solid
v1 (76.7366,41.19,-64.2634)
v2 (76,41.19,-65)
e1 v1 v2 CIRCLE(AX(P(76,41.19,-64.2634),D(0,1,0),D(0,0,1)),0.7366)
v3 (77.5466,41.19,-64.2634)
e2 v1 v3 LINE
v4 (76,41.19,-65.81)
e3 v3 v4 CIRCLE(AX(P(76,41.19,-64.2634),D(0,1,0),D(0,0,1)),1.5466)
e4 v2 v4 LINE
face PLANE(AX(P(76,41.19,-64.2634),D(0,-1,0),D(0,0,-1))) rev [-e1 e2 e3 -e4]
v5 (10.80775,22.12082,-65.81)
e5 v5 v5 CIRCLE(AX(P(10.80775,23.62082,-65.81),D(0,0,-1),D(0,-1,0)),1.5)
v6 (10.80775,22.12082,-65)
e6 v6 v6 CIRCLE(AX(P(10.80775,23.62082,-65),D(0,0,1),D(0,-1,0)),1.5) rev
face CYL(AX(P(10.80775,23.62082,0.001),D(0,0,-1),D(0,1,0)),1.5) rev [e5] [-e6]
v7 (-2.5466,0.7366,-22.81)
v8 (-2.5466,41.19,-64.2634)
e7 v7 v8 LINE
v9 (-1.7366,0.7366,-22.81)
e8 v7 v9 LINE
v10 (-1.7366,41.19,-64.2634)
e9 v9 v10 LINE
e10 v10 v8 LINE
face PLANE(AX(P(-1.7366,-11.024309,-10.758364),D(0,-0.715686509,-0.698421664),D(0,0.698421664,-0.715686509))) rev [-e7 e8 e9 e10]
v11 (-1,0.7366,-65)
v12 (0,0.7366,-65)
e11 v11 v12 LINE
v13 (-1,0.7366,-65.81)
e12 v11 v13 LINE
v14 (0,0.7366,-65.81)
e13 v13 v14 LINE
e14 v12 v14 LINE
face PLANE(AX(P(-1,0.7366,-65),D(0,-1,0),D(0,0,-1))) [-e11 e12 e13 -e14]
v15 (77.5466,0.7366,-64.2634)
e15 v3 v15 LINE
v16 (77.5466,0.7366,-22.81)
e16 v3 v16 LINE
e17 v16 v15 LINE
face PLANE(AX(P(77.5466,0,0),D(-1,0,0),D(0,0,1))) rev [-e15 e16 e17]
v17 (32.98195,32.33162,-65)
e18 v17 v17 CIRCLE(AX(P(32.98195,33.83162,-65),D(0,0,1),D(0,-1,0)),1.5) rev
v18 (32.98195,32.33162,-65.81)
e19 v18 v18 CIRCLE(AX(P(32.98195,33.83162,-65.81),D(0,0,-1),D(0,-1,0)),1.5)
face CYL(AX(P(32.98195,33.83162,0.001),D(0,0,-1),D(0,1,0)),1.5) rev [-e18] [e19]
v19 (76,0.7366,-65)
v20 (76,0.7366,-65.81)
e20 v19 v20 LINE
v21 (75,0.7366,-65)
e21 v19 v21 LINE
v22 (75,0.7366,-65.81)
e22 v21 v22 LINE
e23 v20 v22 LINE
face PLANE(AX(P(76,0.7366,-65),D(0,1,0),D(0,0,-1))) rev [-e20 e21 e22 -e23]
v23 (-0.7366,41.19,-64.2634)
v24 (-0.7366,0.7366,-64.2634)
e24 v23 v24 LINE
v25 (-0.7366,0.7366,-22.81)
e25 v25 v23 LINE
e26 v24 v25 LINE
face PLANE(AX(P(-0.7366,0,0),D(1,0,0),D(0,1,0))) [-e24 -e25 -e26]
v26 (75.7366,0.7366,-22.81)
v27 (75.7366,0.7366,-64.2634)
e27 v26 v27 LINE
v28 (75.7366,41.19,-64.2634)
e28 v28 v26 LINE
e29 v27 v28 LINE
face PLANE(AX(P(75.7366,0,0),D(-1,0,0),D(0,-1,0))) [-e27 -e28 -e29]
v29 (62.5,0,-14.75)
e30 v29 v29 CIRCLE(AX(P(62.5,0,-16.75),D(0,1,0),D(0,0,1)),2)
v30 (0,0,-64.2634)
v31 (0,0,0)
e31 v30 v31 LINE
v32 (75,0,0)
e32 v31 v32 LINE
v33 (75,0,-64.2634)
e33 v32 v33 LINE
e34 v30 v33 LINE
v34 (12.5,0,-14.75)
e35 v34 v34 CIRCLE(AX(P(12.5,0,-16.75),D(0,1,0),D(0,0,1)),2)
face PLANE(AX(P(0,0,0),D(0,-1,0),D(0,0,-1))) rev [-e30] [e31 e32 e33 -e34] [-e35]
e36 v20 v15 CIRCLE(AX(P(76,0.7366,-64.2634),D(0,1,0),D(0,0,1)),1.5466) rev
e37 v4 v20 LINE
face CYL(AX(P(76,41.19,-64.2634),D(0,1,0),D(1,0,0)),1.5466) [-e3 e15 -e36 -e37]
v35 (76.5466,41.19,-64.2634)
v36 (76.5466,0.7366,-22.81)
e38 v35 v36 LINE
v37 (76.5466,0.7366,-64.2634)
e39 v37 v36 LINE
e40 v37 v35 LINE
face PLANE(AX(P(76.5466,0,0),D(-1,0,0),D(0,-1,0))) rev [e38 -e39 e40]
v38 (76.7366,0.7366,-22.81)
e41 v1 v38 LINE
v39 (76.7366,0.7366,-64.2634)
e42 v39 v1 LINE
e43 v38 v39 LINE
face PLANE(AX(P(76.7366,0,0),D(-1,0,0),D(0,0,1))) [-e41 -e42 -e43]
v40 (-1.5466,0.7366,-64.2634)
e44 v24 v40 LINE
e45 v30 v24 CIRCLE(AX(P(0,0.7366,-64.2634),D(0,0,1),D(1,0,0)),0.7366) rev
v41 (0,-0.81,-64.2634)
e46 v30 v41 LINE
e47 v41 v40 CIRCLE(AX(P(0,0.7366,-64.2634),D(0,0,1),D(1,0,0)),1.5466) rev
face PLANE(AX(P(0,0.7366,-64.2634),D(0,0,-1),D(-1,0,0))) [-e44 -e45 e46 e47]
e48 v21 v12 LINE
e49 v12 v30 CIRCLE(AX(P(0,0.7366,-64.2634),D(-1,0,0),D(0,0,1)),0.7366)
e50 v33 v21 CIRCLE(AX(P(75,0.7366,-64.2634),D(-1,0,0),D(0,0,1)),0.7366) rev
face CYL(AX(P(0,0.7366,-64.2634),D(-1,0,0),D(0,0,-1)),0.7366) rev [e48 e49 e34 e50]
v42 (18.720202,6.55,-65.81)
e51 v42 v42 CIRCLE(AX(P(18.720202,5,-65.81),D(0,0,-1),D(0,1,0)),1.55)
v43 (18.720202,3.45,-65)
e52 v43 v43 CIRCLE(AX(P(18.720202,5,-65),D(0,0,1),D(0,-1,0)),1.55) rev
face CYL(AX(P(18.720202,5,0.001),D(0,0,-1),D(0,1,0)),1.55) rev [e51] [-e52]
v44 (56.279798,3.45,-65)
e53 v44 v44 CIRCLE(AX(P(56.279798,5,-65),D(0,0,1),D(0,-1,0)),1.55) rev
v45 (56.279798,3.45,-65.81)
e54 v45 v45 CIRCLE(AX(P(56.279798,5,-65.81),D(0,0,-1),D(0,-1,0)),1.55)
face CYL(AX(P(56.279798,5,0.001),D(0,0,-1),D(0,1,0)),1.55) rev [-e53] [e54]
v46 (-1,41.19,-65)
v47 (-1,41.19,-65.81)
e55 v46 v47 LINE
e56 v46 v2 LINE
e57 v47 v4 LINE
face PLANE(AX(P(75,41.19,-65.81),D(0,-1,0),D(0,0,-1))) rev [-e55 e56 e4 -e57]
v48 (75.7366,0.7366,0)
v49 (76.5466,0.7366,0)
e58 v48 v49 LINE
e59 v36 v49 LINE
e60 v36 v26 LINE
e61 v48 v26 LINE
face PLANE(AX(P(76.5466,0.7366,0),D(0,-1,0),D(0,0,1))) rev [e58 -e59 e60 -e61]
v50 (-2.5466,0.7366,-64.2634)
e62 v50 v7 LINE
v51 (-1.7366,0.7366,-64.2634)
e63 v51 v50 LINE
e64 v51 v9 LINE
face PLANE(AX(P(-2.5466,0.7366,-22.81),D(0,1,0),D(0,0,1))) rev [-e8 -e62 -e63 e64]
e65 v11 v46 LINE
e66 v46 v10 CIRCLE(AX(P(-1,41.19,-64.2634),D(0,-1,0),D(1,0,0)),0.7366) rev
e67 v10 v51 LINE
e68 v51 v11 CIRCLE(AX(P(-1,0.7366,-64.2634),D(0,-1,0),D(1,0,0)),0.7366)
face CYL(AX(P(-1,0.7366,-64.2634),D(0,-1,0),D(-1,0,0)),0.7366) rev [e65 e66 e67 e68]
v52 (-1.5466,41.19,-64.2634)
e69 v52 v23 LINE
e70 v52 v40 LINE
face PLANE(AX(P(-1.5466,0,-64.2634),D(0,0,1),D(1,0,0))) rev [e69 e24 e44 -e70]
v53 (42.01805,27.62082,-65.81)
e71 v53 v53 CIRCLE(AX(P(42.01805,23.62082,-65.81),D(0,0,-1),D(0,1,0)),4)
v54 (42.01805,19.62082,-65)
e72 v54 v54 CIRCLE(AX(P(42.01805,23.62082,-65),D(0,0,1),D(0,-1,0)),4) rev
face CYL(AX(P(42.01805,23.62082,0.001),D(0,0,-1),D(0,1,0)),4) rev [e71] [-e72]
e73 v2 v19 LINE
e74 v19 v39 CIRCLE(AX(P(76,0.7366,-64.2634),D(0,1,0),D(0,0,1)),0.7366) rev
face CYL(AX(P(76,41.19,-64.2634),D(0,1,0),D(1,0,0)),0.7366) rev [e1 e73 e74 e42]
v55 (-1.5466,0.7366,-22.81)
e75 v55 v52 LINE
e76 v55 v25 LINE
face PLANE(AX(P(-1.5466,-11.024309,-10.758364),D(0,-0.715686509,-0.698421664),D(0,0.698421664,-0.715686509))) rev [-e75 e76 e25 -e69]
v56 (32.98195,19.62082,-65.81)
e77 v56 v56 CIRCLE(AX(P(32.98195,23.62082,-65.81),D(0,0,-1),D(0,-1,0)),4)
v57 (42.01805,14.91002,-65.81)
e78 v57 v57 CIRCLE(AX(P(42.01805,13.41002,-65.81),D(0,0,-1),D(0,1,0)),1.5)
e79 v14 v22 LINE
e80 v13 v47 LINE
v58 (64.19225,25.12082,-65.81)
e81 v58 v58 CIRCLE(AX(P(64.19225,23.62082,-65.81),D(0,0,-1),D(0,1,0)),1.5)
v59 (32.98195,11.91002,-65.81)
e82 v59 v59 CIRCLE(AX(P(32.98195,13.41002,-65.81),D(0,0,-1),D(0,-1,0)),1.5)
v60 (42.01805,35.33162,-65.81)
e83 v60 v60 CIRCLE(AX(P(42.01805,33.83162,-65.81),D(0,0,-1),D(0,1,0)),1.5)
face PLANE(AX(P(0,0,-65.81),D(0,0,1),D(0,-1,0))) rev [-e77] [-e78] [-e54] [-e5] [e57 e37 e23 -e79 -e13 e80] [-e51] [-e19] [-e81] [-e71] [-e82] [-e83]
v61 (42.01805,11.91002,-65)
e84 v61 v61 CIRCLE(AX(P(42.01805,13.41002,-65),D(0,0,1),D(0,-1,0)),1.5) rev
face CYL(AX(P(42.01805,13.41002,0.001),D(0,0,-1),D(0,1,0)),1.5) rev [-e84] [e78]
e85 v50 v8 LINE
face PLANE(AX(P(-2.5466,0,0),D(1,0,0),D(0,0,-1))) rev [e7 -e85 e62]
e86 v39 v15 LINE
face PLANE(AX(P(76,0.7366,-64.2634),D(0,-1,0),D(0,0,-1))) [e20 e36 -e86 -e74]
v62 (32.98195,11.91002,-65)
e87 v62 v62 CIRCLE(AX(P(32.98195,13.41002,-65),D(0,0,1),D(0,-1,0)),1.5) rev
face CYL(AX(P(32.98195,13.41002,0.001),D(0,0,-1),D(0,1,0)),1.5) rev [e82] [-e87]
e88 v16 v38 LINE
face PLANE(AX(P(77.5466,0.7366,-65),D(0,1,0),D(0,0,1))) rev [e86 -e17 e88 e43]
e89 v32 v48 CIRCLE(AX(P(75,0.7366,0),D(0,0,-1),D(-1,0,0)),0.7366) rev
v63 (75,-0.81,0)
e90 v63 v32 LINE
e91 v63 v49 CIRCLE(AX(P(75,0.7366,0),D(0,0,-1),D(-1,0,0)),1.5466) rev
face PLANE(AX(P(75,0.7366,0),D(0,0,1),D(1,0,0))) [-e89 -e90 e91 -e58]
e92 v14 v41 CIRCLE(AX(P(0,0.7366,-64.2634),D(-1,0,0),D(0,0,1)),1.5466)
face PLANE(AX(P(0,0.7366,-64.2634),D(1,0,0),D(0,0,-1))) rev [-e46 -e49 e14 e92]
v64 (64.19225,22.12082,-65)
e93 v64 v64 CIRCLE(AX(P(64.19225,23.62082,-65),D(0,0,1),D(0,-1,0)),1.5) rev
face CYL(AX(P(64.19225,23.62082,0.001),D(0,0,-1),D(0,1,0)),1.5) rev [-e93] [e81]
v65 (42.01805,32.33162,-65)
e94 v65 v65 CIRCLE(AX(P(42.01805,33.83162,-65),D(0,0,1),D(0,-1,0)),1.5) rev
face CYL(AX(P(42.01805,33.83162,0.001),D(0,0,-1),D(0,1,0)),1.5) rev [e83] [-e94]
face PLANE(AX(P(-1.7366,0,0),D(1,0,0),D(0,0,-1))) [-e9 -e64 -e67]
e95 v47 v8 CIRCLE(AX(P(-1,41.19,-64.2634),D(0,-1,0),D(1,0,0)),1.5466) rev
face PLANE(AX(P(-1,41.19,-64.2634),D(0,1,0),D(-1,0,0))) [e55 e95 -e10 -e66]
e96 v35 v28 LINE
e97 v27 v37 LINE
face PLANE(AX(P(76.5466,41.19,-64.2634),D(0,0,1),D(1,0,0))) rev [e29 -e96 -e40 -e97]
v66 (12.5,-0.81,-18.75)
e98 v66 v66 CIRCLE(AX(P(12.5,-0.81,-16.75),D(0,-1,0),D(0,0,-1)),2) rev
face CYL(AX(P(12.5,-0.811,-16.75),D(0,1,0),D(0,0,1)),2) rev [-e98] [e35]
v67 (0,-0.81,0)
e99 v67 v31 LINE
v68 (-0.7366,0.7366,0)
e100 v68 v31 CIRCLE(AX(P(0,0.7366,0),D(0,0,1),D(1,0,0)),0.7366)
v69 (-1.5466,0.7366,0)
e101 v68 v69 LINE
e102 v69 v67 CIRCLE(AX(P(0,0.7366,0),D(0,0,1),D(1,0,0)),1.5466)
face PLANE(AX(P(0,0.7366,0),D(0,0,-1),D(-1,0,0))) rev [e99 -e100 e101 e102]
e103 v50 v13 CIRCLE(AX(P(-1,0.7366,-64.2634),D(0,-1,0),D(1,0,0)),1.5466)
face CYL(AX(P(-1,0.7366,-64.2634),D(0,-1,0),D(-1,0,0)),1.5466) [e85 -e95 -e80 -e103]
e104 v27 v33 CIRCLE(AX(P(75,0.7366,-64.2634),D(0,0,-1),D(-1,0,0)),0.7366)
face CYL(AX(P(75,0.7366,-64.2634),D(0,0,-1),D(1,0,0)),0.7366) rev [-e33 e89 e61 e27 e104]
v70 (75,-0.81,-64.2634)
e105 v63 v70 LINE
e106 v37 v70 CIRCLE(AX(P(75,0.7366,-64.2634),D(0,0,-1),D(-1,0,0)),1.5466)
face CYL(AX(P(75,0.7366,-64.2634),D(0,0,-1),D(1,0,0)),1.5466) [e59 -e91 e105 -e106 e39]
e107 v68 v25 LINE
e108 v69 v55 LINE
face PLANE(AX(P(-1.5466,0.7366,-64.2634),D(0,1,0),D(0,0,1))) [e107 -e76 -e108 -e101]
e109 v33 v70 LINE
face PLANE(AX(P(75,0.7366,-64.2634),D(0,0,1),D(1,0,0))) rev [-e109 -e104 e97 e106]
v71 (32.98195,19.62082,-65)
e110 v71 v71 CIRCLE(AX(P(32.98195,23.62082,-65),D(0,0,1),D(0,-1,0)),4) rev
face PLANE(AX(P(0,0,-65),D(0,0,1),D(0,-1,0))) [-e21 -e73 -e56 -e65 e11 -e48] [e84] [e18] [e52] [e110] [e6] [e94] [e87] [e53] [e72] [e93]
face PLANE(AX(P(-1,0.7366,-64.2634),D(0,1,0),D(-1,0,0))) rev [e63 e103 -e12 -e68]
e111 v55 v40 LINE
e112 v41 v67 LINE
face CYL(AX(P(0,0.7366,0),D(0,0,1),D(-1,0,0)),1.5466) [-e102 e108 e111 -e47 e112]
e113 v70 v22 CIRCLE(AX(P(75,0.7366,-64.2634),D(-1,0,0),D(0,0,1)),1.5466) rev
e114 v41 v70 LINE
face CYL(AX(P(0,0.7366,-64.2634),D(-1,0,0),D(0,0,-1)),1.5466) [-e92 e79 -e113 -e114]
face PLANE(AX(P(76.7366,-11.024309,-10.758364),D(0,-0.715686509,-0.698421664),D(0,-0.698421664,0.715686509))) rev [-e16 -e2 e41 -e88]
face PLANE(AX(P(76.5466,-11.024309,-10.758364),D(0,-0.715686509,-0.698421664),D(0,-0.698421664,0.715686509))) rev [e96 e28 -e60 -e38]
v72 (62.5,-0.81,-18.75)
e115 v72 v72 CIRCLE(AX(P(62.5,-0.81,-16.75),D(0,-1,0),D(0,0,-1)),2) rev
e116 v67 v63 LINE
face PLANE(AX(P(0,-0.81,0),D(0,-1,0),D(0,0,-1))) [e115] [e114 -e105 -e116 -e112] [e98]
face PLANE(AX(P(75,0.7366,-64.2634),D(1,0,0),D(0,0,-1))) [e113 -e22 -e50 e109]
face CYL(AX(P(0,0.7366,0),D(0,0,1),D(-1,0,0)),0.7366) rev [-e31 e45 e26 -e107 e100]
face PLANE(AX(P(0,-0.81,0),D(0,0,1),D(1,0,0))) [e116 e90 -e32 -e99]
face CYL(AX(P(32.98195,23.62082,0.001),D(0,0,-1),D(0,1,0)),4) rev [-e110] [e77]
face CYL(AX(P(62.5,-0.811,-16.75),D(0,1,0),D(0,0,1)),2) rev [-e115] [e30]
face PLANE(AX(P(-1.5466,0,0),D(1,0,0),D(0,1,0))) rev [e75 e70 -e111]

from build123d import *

# Parameters (mm, degrees)
SKETCH1_W                    = 75
SKETCH1_H                    = 65
BASE_FLANGE1_DEPTH           = 0.81
EDGE_FLANGE1_STRIP_W         = 4.7132
EDGE_FLANGE1_STRIP_H         = 0.81
EDGE_FLANGE1_STRIP_CUT_DEPTH = 75
EDGE_FLANGE1_DEPTH           = 75
EDGE_FLANGE2_DEPTH           = 40.4534
EDGE_FLANGE2_BEND_DEPTH      = 40.4534
EDGE_FLANGE3_DEPTH           = 64.2634
EDGE_FLANGE3_BEND_DEPTH      = 64.2634
CUT_EXTRUDE1_REACH           = 113.546
CUT_EXTRUDE2_REACH           = 111.732
SKETCH24_R                   = 4
SKETCH24_R_2                 = 1.5
SKETCH24_R_3                 = 1.55
CUT_EXTRUDE3_REACH           = 111.732
SKETCH25_R                   = 2


# Sheet-metal steps are written as plain solids
with BuildPart() as part:
    # Sketch1 → Base-Flange1 (new body)
    with BuildSketch(Plane(origin=(0, 0, 0), x_dir=(1, 0, 0), z_dir=(0, 1, 0))):
        with Locations((37.5, 32.5)):
            Rectangle(SKETCH1_W, SKETCH1_H)
    extrude(amount=-BASE_FLANGE1_DEPTH)

    # Edge-Flange1 strip (across the edge) → Edge-Flange1 strip cut (cut)
    with BuildSketch(Plane(origin=(75, 0, -65), x_dir=(0, 0, 1), z_dir=(-1, 0, 0))):
        with Locations((-1.62, -0.405)):
            Rectangle(EDGE_FLANGE1_STRIP_W, EDGE_FLANGE1_STRIP_H)
    extrude(amount=EDGE_FLANGE1_STRIP_CUT_DEPTH, mode=Mode.SUBTRACT)

    # Edge-Flange1 section (across the edge) → Edge-Flange1 (add)
    with BuildSketch(Plane(origin=(75, 0, -65), x_dir=(0, 0, 1), z_dir=(-1, 0, 0))):
        with BuildLine():
            Line((-0.81, 0.7366), (-0.81, 41.19))
            Line((-0.81, 41.19), (0, 41.19))
            Line((0, 41.19), (0, 0.7366))
            ThreePointArc((0, 0.7366), (0.215745145, 0.215745145), (0.7366, 0))
            Line((0.7366, 0), (0.7366, -0.81))
            ThreePointArc((0.7366, -0.81), (-0.357011348, -0.357011348), (-0.81, 0.7366))
        make_face()
    extrude(amount=EDGE_FLANGE1_DEPTH)

    # Edge-Flange2 section (across the edge) → Edge-Flange2 (add)
    with BuildSketch(Plane(origin=(-1.7366, 41.19, -65), x_dir=(1, 0, 0), z_dir=(0, -1, 0))):
        with BuildLine():
            Line((-0.81, 0.7366), (-0.81, 42.19))
            Line((-0.81, 42.19), (0, 42.19))
            Line((0, 42.19), (0, 0.7366))
            ThreePointArc((0, 0.7366), (0.215745145, 0.215745145), (0.7366, 0))
            Line((0.7366, 0), (1.7366, 0))
            Line((1.7366, 0), (1.7366, -0.81))
            Line((1.7366, -0.81), (0.7366, -0.81))
            ThreePointArc((0.7366, -0.81), (-0.357011348, -0.357011348), (-0.81, 0.7366))
        make_face()
    extrude(amount=EDGE_FLANGE2_DEPTH)

    # Edge-Flange2 section 2 (across the edge) → Edge-Flange2 bend (add)
    with BuildSketch(Plane(origin=(76.7366, 0.7366, -65), x_dir=(-1, 0, 0), z_dir=(0, 1, 0))):
        with BuildLine():
            Line((-0.81, 0.7366), (-0.81, 42.19))
            Line((-0.81, 42.19), (0, 42.19))
            Line((0, 42.19), (0, 0.7366))
            ThreePointArc((0, 0.7366), (0.215745145, 0.215745145), (0.7366, 0))
            Line((0.7366, 0), (1.7366, 0))
            Line((1.7366, 0), (1.7366, -0.81))
            Line((1.7366, -0.81), (0.7366, -0.81))
            ThreePointArc((0.7366, -0.81), (-0.357011348, -0.357011348), (-0.81, 0.7366))
        make_face()
    extrude(amount=EDGE_FLANGE2_BEND_DEPTH)

    # Edge-Flange3 section (across the edge) → Edge-Flange3 (add)
    with BuildSketch(Plane(origin=(-0.7366, 0, -64.2634), x_dir=(1, 0, 0), z_dir=(0, 0, 1))):
        with BuildLine():
            Line((-0.81, 0.7366), (-0.81, 41.19))
            Line((-0.81, 41.19), (0, 41.19))
            Line((0, 41.19), (0, 0.7366))
            ThreePointArc((0, 0.7366), (0.215745145, 0.215745145), (0.7366, 0))
            Line((0.7366, 0), (0.7366, -0.81))
            ThreePointArc((0.7366, -0.81), (-0.357011348, -0.357011348), (-0.81, 0.7366))
        make_face()
    extrude(amount=EDGE_FLANGE3_DEPTH)

    # Edge-Flange3 section 2 (across the edge) → Edge-Flange3 bend (add)
    with BuildSketch(Plane(origin=(75.7366, 0, 0), x_dir=(-1, 0, 0), z_dir=(0, 0, -1))):
        with BuildLine():
            Line((-0.81, 0.7366), (-0.81, 41.19))
            Line((-0.81, 41.19), (0, 41.19))
            Line((0, 41.19), (0, 0.7366))
            ThreePointArc((0, 0.7366), (0.215745145, 0.215745145), (0.7366, 0))
            Line((0.7366, 0), (0.7366, -0.81))
            ThreePointArc((0.7366, -0.81), (-0.357011348, -0.357011348), (-0.81, 0.7366))
        make_face()
    extrude(amount=EDGE_FLANGE3_BEND_DEPTH)

    # Cut-Extrude1: up to this face of the body (flat: up to its plane)
    cut_extrude1_end = Plane(part.part.faces().sort_by_distance((77.5466, 20.9633, -43.5367))[0])
    # Sketch23 → Cut-Extrude1 (cut, up to the picked face)
    with BuildSketch(Plane.ZY.offset(2.5466), mode=Mode.PRIVATE) as cut_extrude1_sk1:
        Polygon((-64.2634, 41.19), (-22.81, 0.7366), (0, 0.7366), (0, 41.19), align=None)
    cut_extrude1_tool1 = split(extrude(cut_extrude1_sk1.sketch, amount=-CUT_EXTRUDE1_REACH, mode=Mode.PRIVATE), bisect_by=cut_extrude1_end, keep=Keep.BOTH, mode=Mode.PRIVATE)
    add(cut_extrude1_tool1.solids().sort_by(Axis((-2.5466, 24.173103, -23.412925), (1, 0, 0)))[0], mode=Mode.SUBTRACT)

    # Sketch24 → Cut-Extrude2 (cut, up to next)
    with BuildSketch(Plane(origin=(0, 0, -65.81), x_dir=(-1, 0, 0), z_dir=(0, 0, -1)), mode=Mode.PRIVATE) as cut_extrude2_sk1:
        with Locations(Location((-42.01805, 23.62082, 0), (0, 0, 90))):
            Circle(SKETCH24_R)
    cut_extrude2_tool1 = extrude(cut_extrude2_sk1.sketch, amount=-CUT_EXTRUDE2_REACH, mode=Mode.PRIVATE) & part.part
    # Sketch24 → Cut-Extrude2 (cut, up to next)
    with BuildSketch(Plane(origin=(0, 0, -65.81), x_dir=(-1, 0, 0), z_dir=(0, 0, -1)), mode=Mode.PRIVATE) as cut_extrude2_sk2:
        with Locations(Location((-42.01805, 33.83162, 0), (0, 0, 90))):
            Circle(SKETCH24_R_2)
    cut_extrude2_tool2 = extrude(cut_extrude2_sk2.sketch, amount=-CUT_EXTRUDE2_REACH, mode=Mode.PRIVATE) & part.part
    # Sketch24 → Cut-Extrude2 (cut, up to next)
    with BuildSketch(Plane(origin=(0, 0, -65.81), x_dir=(-1, 0, 0), z_dir=(0, 0, -1)), mode=Mode.PRIVATE) as cut_extrude2_sk3:
        with Locations(Location((-64.19225, 23.62082, 0), (0, 0, 90))):
            Circle(SKETCH24_R_2)
    cut_extrude2_tool3 = extrude(cut_extrude2_sk3.sketch, amount=-CUT_EXTRUDE2_REACH, mode=Mode.PRIVATE) & part.part
    # Sketch24 → Cut-Extrude2 (cut, up to next)
    with BuildSketch(Plane(origin=(0, 0, -65.81), x_dir=(-1, 0, 0), z_dir=(0, 0, -1)), mode=Mode.PRIVATE) as cut_extrude2_sk4:
        with Locations(Location((-42.01805, 13.41002, 0), (0, 0, 90))):
            Circle(SKETCH24_R_2)
    cut_extrude2_tool4 = extrude(cut_extrude2_sk4.sketch, amount=-CUT_EXTRUDE2_REACH, mode=Mode.PRIVATE) & part.part
    # Sketch24 → Cut-Extrude2 (cut, up to next)
    with BuildSketch(Plane(origin=(0, 0, -65.81), x_dir=(-1, 0, 0), z_dir=(0, 0, -1)), mode=Mode.PRIVATE) as cut_extrude2_sk5:
        with Locations(Location((-18.720201976, 5, 0), (0, 0, 90))):
            Circle(SKETCH24_R_3)
    cut_extrude2_tool5 = extrude(cut_extrude2_sk5.sketch, amount=-CUT_EXTRUDE2_REACH, mode=Mode.PRIVATE) & part.part
    # Sketch24 → Cut-Extrude2 (cut, up to next)
    with BuildSketch(Plane(origin=(0, 0, -65.81), x_dir=(-1, 0, 0), z_dir=(0, 0, -1)), mode=Mode.PRIVATE) as cut_extrude2_sk6:
        with Locations(Location((-56.279798024, 5, 0), (0, 0, 270))):
            Circle(SKETCH24_R_3)
    cut_extrude2_tool6 = extrude(cut_extrude2_sk6.sketch, amount=-CUT_EXTRUDE2_REACH, mode=Mode.PRIVATE) & part.part
    # Sketch24 → Cut-Extrude2 (cut, up to next)
    with BuildSketch(Plane(origin=(0, 0, -65.81), x_dir=(-1, 0, 0), z_dir=(0, 0, -1)), mode=Mode.PRIVATE) as cut_extrude2_sk7:
        with Locations(Location((-32.98195, 13.41002, 0), (0, 0, 270))):
            Circle(SKETCH24_R_2)
    cut_extrude2_tool7 = extrude(cut_extrude2_sk7.sketch, amount=-CUT_EXTRUDE2_REACH, mode=Mode.PRIVATE) & part.part
    # Sketch24 → Cut-Extrude2 (cut, up to next)
    with BuildSketch(Plane(origin=(0, 0, -65.81), x_dir=(-1, 0, 0), z_dir=(0, 0, -1)), mode=Mode.PRIVATE) as cut_extrude2_sk8:
        with Locations(Location((-10.80775, 23.62082, 0), (0, 0, 270))):
            Circle(SKETCH24_R_2)
    cut_extrude2_tool8 = extrude(cut_extrude2_sk8.sketch, amount=-CUT_EXTRUDE2_REACH, mode=Mode.PRIVATE) & part.part
    # Sketch24 → Cut-Extrude2 (cut, up to next)
    with BuildSketch(Plane(origin=(0, 0, -65.81), x_dir=(-1, 0, 0), z_dir=(0, 0, -1)), mode=Mode.PRIVATE) as cut_extrude2_sk9:
        with Locations(Location((-32.98195, 33.83162, 0), (0, 0, 270))):
            Circle(SKETCH24_R_2)
    cut_extrude2_tool9 = extrude(cut_extrude2_sk9.sketch, amount=-CUT_EXTRUDE2_REACH, mode=Mode.PRIVATE) & part.part
    # Sketch24 → Cut-Extrude2 (cut, up to next)
    with BuildSketch(Plane(origin=(0, 0, -65.81), x_dir=(-1, 0, 0), z_dir=(0, 0, -1)), mode=Mode.PRIVATE) as cut_extrude2_sk10:
        with Locations(Location((-32.98195, 23.62082, 0), (0, 0, 270))):
            Circle(SKETCH24_R)
    cut_extrude2_tool10 = extrude(cut_extrude2_sk10.sketch, amount=-CUT_EXTRUDE2_REACH, mode=Mode.PRIVATE) & part.part
    add(cut_extrude2_tool1.solids().sort_by_distance((42.01805, 23.62082, -65.81))[0], mode=Mode.SUBTRACT)
    add(cut_extrude2_tool2.solids().sort_by_distance((42.01805, 33.83162, -65.81))[0], mode=Mode.SUBTRACT)
    add(cut_extrude2_tool3.solids().sort_by_distance((64.19225, 23.62082, -65.81))[0], mode=Mode.SUBTRACT)
    add(cut_extrude2_tool4.solids().sort_by_distance((42.01805, 13.41002, -65.81))[0], mode=Mode.SUBTRACT)
    add(cut_extrude2_tool5.solids().sort_by_distance((18.720202, 5, -65.81))[0], mode=Mode.SUBTRACT)
    add(cut_extrude2_tool6.solids().sort_by_distance((56.279798, 5, -65.81))[0], mode=Mode.SUBTRACT)
    add(cut_extrude2_tool7.solids().sort_by_distance((32.98195, 13.41002, -65.81))[0], mode=Mode.SUBTRACT)
    add(cut_extrude2_tool8.solids().sort_by_distance((10.80775, 23.62082, -65.81))[0], mode=Mode.SUBTRACT)
    add(cut_extrude2_tool9.solids().sort_by_distance((32.98195, 33.83162, -65.81))[0], mode=Mode.SUBTRACT)
    add(cut_extrude2_tool10.solids().sort_by_distance((32.98195, 23.62082, -65.81))[0], mode=Mode.SUBTRACT)

    # Sketch25 → Cut-Extrude3 (cut, up to next)
    with BuildSketch(Plane(origin=(0, 0, 0), x_dir=(1, 0, 0), z_dir=(0, 1, 0)), mode=Mode.PRIVATE) as cut_extrude3_sk1:
        with Locations(Location((62.5, 16.75, 0), (0, 0, 270))):
            Circle(SKETCH25_R)
    cut_extrude3_tool1 = extrude(cut_extrude3_sk1.sketch, amount=-CUT_EXTRUDE3_REACH, mode=Mode.PRIVATE) & part.part
    # Sketch25 → Cut-Extrude3 (cut, up to next)
    with BuildSketch(Plane(origin=(0, 0, 0), x_dir=(1, 0, 0), z_dir=(0, 1, 0)), mode=Mode.PRIVATE) as cut_extrude3_sk2:
        with Locations(Location((12.5, 16.75, 0), (0, 0, 270))):
            Circle(SKETCH25_R)
    cut_extrude3_tool2 = extrude(cut_extrude3_sk2.sketch, amount=-CUT_EXTRUDE3_REACH, mode=Mode.PRIVATE) & part.part
    add(cut_extrude3_tool1.solids().sort_by_distance((62.5, 0, -16.75))[0], mode=Mode.SUBTRACT)
    add(cut_extrude3_tool2.solids().sort_by_distance((12.5, 0, -16.75))[0], mode=Mode.SUBTRACT)


solid = part.part
